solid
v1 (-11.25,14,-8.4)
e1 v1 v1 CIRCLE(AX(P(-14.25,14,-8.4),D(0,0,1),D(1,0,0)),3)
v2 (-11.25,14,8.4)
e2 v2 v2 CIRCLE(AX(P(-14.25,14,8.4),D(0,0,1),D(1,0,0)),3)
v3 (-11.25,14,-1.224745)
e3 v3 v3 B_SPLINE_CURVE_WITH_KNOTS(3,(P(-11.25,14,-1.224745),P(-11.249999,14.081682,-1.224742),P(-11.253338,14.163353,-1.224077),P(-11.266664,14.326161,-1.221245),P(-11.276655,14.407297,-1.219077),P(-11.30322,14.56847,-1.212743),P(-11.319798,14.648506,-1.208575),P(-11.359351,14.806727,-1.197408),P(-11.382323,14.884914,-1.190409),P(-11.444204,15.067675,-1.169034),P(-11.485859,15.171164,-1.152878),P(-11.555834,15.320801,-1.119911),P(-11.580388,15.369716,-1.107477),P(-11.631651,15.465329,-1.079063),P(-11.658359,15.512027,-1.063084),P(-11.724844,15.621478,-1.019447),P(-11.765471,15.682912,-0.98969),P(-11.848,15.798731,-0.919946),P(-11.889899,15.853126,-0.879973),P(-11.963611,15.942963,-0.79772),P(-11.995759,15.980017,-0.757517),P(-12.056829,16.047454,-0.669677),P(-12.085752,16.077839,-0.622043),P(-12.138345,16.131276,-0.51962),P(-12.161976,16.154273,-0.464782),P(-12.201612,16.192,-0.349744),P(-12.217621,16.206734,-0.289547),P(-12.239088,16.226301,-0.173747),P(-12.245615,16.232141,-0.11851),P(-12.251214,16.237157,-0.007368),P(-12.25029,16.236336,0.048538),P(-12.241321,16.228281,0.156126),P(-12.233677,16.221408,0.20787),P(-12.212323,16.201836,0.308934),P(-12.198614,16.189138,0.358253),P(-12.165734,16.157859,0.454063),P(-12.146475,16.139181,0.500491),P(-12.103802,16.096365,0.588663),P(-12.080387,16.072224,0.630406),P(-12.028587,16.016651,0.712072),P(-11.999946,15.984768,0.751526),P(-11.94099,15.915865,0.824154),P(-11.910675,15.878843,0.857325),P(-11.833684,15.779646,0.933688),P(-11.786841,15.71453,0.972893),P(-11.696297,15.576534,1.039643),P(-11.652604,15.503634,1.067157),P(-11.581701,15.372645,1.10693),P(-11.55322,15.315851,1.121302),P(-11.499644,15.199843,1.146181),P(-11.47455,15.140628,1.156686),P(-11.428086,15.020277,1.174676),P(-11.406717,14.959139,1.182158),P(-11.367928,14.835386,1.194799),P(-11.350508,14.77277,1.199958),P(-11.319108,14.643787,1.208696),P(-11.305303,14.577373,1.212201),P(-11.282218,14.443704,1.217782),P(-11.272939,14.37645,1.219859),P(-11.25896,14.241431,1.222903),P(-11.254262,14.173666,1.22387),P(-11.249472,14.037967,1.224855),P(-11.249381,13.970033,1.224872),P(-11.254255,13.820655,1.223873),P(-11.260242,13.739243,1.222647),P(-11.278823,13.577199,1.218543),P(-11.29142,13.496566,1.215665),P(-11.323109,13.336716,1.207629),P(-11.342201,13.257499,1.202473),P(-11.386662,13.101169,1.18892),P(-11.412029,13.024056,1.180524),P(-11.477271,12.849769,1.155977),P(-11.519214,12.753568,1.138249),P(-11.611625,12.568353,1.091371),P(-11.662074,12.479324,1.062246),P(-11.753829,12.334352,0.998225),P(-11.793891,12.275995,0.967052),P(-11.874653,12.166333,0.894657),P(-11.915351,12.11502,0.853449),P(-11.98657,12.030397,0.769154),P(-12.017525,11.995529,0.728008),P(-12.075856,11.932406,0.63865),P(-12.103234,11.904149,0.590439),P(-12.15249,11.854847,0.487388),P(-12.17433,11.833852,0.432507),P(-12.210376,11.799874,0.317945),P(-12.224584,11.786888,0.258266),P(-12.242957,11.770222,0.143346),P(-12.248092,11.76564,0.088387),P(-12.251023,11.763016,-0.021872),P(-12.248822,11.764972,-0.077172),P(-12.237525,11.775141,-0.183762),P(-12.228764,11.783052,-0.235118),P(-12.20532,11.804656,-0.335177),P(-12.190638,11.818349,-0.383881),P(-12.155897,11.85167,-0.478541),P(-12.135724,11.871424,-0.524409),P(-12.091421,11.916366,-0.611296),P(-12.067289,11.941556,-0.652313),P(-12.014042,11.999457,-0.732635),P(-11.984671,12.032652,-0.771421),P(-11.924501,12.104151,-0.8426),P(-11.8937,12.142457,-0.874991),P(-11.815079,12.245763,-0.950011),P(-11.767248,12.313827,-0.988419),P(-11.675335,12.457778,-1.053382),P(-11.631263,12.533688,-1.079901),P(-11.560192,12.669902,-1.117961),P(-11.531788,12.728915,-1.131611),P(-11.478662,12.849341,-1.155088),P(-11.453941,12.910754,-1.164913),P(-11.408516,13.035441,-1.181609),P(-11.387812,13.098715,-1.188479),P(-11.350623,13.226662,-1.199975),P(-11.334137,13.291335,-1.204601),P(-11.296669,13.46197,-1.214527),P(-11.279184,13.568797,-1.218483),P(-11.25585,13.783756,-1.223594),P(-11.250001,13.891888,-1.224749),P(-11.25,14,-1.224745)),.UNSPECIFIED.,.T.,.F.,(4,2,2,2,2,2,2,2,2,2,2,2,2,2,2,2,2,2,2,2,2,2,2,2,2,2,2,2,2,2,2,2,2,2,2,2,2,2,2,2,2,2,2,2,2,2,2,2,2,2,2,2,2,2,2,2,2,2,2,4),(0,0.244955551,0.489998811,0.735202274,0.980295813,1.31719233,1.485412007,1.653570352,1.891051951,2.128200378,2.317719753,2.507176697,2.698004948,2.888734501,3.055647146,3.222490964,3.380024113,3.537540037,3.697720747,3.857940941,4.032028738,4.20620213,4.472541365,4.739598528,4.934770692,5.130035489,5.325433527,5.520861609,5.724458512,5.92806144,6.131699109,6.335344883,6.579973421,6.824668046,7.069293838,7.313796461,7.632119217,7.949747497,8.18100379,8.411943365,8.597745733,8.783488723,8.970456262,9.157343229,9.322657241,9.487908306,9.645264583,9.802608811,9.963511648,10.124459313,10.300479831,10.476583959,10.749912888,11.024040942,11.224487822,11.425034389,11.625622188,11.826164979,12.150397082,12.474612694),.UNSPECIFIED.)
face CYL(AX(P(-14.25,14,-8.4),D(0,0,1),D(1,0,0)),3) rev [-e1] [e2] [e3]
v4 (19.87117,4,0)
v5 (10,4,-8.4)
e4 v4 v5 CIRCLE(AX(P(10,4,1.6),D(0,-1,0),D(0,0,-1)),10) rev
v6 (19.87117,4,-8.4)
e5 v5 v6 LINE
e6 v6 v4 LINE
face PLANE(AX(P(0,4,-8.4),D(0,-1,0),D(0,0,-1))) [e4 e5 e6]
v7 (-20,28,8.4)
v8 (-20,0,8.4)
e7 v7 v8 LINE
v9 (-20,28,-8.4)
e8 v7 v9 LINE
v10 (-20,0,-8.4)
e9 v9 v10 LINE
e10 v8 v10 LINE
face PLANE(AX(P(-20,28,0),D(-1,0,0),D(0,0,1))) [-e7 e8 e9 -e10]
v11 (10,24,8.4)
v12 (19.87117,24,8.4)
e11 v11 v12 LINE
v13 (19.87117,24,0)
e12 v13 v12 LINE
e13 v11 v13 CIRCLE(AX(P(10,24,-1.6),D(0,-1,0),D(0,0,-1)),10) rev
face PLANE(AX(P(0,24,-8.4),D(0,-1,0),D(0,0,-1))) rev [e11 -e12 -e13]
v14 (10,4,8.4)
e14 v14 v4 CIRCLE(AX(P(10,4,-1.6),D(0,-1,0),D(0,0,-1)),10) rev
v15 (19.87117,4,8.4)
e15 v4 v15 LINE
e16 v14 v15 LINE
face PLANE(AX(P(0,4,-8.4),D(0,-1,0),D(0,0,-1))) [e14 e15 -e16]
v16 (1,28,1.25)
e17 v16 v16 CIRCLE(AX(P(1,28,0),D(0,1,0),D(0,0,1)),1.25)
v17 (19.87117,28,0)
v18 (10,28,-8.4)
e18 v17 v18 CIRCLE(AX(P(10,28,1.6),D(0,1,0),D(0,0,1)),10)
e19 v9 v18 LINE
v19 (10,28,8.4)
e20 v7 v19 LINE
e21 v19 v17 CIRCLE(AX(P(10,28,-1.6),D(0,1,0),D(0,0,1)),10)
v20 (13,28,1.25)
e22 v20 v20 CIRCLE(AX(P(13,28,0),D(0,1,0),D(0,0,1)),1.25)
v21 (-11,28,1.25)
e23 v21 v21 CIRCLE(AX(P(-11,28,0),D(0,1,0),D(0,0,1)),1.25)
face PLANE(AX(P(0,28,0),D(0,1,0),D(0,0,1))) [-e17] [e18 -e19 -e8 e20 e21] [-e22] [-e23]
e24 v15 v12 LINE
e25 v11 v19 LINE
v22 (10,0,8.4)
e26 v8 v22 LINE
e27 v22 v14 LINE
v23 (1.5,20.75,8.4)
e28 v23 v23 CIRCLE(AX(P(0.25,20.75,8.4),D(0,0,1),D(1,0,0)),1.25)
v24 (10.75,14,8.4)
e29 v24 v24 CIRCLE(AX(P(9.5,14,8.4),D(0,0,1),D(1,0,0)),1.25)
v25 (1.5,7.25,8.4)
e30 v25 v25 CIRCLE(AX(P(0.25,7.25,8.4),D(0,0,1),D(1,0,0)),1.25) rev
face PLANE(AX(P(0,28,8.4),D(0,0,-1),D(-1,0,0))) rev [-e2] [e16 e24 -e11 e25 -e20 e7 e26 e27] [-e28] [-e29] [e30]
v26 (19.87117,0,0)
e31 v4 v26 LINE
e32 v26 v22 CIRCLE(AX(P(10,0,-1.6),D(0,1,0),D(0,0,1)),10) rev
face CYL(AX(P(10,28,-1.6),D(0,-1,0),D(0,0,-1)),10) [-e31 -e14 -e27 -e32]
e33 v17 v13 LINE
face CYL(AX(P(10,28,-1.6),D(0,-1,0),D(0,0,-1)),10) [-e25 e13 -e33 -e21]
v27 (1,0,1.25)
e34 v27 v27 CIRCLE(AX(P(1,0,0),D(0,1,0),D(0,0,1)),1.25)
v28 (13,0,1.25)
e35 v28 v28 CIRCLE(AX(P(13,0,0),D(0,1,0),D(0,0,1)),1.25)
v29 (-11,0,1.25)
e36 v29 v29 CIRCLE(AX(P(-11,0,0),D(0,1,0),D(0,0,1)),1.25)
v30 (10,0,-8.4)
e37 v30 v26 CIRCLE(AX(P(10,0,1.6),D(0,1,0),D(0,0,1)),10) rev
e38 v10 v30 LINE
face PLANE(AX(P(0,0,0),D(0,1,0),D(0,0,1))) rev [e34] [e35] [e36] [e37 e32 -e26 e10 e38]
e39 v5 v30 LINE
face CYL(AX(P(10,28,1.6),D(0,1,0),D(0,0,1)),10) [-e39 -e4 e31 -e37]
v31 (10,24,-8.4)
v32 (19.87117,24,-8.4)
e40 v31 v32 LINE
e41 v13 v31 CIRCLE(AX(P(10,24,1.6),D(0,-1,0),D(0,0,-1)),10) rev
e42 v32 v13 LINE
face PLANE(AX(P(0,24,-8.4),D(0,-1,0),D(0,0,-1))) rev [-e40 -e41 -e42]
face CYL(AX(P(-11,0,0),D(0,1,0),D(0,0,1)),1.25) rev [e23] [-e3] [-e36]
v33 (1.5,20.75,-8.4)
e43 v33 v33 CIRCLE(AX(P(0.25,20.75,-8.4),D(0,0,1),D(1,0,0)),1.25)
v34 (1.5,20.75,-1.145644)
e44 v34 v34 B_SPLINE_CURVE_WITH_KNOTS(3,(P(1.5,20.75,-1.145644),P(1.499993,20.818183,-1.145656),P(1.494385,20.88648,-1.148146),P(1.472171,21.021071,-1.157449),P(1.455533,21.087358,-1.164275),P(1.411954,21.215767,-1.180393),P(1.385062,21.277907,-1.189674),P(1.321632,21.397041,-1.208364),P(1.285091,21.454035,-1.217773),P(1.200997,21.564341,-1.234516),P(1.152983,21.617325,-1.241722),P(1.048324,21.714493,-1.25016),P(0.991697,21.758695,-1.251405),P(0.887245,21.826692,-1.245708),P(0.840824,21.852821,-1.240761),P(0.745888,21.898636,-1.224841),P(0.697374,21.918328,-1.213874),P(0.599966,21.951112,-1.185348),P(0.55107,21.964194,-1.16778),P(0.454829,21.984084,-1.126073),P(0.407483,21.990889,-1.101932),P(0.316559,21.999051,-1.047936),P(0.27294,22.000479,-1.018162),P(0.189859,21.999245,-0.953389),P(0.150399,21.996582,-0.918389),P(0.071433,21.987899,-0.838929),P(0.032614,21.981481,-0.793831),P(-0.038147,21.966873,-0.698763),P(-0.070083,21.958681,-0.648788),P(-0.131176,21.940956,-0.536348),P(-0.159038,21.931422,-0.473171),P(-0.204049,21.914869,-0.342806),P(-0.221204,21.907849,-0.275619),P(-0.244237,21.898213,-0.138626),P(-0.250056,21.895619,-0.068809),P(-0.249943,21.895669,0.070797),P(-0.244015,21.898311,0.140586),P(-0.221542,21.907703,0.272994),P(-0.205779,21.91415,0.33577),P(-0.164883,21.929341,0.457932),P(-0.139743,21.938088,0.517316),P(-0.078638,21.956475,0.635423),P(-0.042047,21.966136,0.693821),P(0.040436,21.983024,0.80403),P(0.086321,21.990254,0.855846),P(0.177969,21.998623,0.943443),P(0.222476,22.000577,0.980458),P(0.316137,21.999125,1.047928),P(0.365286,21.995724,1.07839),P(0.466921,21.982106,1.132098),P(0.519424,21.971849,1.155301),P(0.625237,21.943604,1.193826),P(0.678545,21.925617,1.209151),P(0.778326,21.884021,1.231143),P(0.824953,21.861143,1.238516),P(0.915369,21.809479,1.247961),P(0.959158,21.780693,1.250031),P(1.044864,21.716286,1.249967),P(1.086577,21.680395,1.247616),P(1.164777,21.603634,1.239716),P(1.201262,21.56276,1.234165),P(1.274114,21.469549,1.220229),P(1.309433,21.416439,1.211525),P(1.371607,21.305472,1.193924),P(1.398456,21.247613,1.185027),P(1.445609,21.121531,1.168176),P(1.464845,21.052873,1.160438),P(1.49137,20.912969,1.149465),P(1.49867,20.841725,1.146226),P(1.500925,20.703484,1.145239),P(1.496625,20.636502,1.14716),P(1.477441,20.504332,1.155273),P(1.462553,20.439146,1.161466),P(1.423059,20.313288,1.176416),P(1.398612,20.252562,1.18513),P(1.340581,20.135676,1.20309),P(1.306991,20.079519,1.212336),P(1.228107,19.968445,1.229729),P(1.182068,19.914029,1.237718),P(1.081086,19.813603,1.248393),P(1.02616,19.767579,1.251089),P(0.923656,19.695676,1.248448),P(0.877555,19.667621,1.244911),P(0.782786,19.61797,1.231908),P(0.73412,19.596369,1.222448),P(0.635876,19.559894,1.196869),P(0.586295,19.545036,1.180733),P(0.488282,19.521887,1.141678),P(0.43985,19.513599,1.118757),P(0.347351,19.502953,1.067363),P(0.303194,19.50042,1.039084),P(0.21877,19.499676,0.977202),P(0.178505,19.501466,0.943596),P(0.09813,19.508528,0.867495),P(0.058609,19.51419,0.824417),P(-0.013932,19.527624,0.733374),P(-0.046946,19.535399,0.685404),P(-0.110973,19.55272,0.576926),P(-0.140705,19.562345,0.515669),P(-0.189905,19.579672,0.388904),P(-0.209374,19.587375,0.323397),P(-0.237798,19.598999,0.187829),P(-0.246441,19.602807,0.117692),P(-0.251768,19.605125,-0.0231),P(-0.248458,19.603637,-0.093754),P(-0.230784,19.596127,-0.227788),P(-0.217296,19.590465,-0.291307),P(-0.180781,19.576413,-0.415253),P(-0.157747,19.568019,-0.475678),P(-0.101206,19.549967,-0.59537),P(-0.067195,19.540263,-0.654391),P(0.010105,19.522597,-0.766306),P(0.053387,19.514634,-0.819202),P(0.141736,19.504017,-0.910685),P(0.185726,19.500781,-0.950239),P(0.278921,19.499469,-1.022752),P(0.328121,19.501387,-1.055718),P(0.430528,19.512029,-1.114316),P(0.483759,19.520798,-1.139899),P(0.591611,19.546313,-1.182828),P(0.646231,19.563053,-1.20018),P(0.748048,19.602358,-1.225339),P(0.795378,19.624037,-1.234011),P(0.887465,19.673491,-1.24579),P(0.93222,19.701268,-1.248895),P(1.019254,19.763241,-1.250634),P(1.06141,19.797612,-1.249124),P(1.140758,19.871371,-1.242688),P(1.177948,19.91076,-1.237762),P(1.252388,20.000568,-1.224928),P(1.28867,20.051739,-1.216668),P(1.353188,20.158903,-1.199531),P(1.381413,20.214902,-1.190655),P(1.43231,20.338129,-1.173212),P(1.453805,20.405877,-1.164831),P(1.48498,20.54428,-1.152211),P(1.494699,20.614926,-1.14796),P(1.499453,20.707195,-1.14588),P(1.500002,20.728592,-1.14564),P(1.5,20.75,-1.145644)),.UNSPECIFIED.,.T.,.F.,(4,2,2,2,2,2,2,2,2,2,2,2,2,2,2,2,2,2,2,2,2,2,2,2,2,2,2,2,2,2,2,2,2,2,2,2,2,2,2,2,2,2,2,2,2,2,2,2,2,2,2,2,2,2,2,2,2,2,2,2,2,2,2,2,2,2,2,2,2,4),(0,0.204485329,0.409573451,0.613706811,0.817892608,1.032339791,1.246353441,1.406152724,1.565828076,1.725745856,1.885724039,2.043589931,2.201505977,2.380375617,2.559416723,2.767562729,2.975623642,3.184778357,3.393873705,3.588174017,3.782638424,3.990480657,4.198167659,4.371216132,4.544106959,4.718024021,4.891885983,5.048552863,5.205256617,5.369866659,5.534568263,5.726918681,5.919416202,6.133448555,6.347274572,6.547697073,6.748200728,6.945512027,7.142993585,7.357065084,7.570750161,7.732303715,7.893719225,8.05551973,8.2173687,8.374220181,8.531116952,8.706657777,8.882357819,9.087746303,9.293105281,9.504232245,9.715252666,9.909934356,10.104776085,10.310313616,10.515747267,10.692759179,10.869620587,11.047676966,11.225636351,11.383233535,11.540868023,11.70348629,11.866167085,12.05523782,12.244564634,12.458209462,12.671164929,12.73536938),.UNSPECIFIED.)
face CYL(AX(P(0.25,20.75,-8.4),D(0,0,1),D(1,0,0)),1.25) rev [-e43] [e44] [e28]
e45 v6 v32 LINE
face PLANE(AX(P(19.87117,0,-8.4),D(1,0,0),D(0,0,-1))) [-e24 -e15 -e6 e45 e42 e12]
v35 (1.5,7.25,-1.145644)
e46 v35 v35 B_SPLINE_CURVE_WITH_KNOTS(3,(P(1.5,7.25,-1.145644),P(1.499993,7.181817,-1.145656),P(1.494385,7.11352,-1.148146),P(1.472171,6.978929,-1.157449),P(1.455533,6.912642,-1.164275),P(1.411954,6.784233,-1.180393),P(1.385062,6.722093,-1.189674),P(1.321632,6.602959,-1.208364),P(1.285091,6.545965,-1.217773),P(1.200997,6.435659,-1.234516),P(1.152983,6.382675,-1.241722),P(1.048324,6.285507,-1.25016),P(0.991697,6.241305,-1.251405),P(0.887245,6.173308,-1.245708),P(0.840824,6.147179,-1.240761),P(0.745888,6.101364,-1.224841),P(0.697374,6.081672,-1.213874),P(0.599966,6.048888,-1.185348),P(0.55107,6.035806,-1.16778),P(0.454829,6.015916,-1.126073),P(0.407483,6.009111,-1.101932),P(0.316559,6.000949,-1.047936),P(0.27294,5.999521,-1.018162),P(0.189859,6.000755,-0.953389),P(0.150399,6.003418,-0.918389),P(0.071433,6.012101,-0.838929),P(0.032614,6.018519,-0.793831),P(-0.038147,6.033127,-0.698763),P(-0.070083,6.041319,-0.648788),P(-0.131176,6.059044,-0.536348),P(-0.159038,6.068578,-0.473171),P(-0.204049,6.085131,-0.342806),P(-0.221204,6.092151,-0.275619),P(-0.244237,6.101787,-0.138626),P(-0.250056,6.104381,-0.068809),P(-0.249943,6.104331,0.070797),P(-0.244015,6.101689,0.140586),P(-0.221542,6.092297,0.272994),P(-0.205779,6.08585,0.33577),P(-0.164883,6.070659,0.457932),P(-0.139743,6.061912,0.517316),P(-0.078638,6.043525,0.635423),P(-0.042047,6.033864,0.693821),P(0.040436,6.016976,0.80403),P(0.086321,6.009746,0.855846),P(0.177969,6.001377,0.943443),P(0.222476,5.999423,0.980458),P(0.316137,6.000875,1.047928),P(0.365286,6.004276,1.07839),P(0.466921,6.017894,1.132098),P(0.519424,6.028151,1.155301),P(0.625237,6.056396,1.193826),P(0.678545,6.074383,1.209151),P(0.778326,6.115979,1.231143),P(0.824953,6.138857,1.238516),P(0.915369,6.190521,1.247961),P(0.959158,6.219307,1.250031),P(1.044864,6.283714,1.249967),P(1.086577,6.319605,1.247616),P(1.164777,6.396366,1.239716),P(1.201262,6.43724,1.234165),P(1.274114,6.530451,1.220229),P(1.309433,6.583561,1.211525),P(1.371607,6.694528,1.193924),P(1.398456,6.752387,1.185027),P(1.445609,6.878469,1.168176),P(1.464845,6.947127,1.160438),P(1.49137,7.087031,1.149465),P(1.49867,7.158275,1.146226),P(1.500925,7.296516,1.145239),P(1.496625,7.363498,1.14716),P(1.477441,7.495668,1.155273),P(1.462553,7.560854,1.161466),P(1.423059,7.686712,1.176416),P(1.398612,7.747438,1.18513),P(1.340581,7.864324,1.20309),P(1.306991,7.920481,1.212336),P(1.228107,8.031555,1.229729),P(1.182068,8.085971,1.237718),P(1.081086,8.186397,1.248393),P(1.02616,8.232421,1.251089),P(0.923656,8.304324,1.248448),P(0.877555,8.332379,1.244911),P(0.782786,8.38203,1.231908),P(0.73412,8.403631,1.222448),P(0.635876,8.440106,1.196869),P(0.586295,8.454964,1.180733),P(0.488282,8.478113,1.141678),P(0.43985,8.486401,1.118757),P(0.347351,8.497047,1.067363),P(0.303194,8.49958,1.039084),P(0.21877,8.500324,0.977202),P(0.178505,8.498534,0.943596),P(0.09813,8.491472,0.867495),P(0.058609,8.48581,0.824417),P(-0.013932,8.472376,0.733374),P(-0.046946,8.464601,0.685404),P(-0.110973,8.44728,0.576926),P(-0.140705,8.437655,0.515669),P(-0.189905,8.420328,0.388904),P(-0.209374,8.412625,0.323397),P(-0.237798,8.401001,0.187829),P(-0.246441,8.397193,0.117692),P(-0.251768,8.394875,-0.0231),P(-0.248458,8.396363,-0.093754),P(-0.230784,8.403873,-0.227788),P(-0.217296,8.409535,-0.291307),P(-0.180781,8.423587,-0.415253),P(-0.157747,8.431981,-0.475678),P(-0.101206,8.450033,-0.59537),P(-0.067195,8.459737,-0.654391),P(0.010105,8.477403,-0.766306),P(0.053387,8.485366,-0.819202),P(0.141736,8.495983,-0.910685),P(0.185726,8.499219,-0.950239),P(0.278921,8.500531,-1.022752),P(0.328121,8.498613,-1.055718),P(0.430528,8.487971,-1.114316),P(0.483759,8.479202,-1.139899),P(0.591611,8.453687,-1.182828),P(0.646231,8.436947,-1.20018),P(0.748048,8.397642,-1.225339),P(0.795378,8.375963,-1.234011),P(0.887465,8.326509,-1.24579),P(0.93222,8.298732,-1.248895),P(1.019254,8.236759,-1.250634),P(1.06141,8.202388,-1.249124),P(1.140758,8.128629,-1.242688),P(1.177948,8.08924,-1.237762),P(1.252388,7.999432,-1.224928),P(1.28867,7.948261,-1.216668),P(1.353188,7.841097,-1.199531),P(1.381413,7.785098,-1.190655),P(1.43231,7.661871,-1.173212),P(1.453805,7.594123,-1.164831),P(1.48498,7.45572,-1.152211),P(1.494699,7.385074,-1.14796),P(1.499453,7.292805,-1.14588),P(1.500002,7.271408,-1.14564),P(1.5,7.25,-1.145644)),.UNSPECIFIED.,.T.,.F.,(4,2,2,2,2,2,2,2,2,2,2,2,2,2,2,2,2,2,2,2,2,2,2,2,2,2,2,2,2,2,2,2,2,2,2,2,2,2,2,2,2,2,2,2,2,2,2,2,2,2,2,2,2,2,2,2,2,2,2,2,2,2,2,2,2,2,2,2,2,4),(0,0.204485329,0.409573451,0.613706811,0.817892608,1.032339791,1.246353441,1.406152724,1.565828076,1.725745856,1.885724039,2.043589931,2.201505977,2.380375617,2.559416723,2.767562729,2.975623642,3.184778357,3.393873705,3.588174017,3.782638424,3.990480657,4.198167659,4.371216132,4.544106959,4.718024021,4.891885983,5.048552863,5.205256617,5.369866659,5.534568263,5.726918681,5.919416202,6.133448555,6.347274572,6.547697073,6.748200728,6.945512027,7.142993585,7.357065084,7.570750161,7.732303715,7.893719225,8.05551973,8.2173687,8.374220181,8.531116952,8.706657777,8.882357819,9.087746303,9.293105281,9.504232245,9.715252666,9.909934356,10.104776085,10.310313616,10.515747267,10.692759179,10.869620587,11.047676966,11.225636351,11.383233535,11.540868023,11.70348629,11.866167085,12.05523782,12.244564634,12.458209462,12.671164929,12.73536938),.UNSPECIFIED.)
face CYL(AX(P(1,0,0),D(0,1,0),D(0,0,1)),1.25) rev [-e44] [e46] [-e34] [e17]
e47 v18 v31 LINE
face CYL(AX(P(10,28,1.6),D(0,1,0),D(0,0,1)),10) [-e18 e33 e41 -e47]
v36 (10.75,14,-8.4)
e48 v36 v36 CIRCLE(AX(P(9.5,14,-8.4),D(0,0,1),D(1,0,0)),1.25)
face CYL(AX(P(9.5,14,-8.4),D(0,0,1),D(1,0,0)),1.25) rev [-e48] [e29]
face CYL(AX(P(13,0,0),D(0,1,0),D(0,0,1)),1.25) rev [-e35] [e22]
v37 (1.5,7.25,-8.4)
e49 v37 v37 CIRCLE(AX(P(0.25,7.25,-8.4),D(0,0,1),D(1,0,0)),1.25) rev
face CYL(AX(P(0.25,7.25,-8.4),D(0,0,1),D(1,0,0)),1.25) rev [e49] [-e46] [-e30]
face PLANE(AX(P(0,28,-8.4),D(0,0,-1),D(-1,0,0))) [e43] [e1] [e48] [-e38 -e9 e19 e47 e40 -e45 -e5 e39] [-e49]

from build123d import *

# Parameters (mm, degrees)
SKETCH1_W           = 40
SKETCH1_H           = 16.8
BOSS_EXTRUDE1_DEPTH = 28
FILLET2_R           = 10
SKETCH3_W           = 9.871170143
SKETCH3_H           = 10
SKETCH3_W_2         = 30
BOSS_EXTRUDE2_DEPTH = 16.8
SKETCH2_R           = 3
SKETCH2_R_2         = 1.25
CUT_EXTRUDE1_DEPTH  = 16.8
SKETCH4_R           = 1.25
CUT_EXTRUDE2_DEPTH  = 36.419768492


with BuildPart() as part:
    # Sketch1 → Boss-Extrude1 (new body)
    with BuildSketch(Plane(origin=(0, 0, 0), x_dir=(1, 0, 0), z_dir=(0, 1, 0))):
        Rectangle(SKETCH1_W, SKETCH1_H)
    extrude(amount=BOSS_EXTRUDE1_DEPTH)

    # Fillet2
    # the kernel refuses this fillet: 10 mm, written as the material it takes off along each edge
    with BuildSketch(Plane(origin=(20, -25, -8.4), x_dir=(0, 0, 1), z_dir=(0, 1, 0)), Plane(origin=(20, -25, 8.4), x_dir=(-1, 0, 0), z_dir=(0, 1, 0))) as fillet2_piece_1:
        with BuildLine():
            CenterArc((FILLET2_R, -FILLET2_R), FILLET2_R, 90, 90)
            Line((0, -FILLET2_R), (0, 0))
            Line((0, 0), (FILLET2_R, 0))
        make_face()
    extrude(amount=78, mode=Mode.SUBTRACT)

    # Sketch3 → Boss-Extrude2 (add)
    with BuildSketch(Plane.XY.offset(8.4)):
        with Locations((14.935585072, 9)):
            Rectangle(SKETCH3_W, SKETCH3_H)
        with Locations((14.935585072, 19)):
            Rectangle(SKETCH3_W, SKETCH3_H)
        with Locations((-5, 19)):
            Rectangle(SKETCH3_W_2, SKETCH3_H)
        with Locations((-5, 9)):
            Rectangle(SKETCH3_W_2, SKETCH3_H)
    extrude(amount=-BOSS_EXTRUDE2_DEPTH)

    # Sketch2 → Cut-Extrude1 (cut)
    with BuildSketch(Plane.XY.offset(8.4)):
        with Locations((-14.25, 14)):
            Circle(SKETCH2_R)
        with Locations((9.5, 14)):
            Circle(SKETCH2_R_2)
        with Locations((0.25, 20.75)):
            Circle(SKETCH2_R_2)
        with Locations((0.25, 7.25)):
            Circle(SKETCH2_R_2)
    extrude(amount=-CUT_EXTRUDE1_DEPTH, mode=Mode.SUBTRACT)

    # Sketch4 → Cut-Extrude2 (cut, through all)
    with BuildSketch(Plane(origin=(0, 28, 0), x_dir=(1, 0, 0), z_dir=(0, 1, 0))):
        with Locations(Location((-11, 0, 0), (0, 0, 270))):
            Circle(SKETCH4_R)
        with Locations(Location((1, 0, 0), (0, 0, 270))):
            Circle(SKETCH4_R)
        with Locations(Location((13, 0, 0), (0, 0, 270))):
            Circle(SKETCH4_R)
    extrude(amount=-CUT_EXTRUDE2_DEPTH, mode=Mode.SUBTRACT)


solid = part.part
